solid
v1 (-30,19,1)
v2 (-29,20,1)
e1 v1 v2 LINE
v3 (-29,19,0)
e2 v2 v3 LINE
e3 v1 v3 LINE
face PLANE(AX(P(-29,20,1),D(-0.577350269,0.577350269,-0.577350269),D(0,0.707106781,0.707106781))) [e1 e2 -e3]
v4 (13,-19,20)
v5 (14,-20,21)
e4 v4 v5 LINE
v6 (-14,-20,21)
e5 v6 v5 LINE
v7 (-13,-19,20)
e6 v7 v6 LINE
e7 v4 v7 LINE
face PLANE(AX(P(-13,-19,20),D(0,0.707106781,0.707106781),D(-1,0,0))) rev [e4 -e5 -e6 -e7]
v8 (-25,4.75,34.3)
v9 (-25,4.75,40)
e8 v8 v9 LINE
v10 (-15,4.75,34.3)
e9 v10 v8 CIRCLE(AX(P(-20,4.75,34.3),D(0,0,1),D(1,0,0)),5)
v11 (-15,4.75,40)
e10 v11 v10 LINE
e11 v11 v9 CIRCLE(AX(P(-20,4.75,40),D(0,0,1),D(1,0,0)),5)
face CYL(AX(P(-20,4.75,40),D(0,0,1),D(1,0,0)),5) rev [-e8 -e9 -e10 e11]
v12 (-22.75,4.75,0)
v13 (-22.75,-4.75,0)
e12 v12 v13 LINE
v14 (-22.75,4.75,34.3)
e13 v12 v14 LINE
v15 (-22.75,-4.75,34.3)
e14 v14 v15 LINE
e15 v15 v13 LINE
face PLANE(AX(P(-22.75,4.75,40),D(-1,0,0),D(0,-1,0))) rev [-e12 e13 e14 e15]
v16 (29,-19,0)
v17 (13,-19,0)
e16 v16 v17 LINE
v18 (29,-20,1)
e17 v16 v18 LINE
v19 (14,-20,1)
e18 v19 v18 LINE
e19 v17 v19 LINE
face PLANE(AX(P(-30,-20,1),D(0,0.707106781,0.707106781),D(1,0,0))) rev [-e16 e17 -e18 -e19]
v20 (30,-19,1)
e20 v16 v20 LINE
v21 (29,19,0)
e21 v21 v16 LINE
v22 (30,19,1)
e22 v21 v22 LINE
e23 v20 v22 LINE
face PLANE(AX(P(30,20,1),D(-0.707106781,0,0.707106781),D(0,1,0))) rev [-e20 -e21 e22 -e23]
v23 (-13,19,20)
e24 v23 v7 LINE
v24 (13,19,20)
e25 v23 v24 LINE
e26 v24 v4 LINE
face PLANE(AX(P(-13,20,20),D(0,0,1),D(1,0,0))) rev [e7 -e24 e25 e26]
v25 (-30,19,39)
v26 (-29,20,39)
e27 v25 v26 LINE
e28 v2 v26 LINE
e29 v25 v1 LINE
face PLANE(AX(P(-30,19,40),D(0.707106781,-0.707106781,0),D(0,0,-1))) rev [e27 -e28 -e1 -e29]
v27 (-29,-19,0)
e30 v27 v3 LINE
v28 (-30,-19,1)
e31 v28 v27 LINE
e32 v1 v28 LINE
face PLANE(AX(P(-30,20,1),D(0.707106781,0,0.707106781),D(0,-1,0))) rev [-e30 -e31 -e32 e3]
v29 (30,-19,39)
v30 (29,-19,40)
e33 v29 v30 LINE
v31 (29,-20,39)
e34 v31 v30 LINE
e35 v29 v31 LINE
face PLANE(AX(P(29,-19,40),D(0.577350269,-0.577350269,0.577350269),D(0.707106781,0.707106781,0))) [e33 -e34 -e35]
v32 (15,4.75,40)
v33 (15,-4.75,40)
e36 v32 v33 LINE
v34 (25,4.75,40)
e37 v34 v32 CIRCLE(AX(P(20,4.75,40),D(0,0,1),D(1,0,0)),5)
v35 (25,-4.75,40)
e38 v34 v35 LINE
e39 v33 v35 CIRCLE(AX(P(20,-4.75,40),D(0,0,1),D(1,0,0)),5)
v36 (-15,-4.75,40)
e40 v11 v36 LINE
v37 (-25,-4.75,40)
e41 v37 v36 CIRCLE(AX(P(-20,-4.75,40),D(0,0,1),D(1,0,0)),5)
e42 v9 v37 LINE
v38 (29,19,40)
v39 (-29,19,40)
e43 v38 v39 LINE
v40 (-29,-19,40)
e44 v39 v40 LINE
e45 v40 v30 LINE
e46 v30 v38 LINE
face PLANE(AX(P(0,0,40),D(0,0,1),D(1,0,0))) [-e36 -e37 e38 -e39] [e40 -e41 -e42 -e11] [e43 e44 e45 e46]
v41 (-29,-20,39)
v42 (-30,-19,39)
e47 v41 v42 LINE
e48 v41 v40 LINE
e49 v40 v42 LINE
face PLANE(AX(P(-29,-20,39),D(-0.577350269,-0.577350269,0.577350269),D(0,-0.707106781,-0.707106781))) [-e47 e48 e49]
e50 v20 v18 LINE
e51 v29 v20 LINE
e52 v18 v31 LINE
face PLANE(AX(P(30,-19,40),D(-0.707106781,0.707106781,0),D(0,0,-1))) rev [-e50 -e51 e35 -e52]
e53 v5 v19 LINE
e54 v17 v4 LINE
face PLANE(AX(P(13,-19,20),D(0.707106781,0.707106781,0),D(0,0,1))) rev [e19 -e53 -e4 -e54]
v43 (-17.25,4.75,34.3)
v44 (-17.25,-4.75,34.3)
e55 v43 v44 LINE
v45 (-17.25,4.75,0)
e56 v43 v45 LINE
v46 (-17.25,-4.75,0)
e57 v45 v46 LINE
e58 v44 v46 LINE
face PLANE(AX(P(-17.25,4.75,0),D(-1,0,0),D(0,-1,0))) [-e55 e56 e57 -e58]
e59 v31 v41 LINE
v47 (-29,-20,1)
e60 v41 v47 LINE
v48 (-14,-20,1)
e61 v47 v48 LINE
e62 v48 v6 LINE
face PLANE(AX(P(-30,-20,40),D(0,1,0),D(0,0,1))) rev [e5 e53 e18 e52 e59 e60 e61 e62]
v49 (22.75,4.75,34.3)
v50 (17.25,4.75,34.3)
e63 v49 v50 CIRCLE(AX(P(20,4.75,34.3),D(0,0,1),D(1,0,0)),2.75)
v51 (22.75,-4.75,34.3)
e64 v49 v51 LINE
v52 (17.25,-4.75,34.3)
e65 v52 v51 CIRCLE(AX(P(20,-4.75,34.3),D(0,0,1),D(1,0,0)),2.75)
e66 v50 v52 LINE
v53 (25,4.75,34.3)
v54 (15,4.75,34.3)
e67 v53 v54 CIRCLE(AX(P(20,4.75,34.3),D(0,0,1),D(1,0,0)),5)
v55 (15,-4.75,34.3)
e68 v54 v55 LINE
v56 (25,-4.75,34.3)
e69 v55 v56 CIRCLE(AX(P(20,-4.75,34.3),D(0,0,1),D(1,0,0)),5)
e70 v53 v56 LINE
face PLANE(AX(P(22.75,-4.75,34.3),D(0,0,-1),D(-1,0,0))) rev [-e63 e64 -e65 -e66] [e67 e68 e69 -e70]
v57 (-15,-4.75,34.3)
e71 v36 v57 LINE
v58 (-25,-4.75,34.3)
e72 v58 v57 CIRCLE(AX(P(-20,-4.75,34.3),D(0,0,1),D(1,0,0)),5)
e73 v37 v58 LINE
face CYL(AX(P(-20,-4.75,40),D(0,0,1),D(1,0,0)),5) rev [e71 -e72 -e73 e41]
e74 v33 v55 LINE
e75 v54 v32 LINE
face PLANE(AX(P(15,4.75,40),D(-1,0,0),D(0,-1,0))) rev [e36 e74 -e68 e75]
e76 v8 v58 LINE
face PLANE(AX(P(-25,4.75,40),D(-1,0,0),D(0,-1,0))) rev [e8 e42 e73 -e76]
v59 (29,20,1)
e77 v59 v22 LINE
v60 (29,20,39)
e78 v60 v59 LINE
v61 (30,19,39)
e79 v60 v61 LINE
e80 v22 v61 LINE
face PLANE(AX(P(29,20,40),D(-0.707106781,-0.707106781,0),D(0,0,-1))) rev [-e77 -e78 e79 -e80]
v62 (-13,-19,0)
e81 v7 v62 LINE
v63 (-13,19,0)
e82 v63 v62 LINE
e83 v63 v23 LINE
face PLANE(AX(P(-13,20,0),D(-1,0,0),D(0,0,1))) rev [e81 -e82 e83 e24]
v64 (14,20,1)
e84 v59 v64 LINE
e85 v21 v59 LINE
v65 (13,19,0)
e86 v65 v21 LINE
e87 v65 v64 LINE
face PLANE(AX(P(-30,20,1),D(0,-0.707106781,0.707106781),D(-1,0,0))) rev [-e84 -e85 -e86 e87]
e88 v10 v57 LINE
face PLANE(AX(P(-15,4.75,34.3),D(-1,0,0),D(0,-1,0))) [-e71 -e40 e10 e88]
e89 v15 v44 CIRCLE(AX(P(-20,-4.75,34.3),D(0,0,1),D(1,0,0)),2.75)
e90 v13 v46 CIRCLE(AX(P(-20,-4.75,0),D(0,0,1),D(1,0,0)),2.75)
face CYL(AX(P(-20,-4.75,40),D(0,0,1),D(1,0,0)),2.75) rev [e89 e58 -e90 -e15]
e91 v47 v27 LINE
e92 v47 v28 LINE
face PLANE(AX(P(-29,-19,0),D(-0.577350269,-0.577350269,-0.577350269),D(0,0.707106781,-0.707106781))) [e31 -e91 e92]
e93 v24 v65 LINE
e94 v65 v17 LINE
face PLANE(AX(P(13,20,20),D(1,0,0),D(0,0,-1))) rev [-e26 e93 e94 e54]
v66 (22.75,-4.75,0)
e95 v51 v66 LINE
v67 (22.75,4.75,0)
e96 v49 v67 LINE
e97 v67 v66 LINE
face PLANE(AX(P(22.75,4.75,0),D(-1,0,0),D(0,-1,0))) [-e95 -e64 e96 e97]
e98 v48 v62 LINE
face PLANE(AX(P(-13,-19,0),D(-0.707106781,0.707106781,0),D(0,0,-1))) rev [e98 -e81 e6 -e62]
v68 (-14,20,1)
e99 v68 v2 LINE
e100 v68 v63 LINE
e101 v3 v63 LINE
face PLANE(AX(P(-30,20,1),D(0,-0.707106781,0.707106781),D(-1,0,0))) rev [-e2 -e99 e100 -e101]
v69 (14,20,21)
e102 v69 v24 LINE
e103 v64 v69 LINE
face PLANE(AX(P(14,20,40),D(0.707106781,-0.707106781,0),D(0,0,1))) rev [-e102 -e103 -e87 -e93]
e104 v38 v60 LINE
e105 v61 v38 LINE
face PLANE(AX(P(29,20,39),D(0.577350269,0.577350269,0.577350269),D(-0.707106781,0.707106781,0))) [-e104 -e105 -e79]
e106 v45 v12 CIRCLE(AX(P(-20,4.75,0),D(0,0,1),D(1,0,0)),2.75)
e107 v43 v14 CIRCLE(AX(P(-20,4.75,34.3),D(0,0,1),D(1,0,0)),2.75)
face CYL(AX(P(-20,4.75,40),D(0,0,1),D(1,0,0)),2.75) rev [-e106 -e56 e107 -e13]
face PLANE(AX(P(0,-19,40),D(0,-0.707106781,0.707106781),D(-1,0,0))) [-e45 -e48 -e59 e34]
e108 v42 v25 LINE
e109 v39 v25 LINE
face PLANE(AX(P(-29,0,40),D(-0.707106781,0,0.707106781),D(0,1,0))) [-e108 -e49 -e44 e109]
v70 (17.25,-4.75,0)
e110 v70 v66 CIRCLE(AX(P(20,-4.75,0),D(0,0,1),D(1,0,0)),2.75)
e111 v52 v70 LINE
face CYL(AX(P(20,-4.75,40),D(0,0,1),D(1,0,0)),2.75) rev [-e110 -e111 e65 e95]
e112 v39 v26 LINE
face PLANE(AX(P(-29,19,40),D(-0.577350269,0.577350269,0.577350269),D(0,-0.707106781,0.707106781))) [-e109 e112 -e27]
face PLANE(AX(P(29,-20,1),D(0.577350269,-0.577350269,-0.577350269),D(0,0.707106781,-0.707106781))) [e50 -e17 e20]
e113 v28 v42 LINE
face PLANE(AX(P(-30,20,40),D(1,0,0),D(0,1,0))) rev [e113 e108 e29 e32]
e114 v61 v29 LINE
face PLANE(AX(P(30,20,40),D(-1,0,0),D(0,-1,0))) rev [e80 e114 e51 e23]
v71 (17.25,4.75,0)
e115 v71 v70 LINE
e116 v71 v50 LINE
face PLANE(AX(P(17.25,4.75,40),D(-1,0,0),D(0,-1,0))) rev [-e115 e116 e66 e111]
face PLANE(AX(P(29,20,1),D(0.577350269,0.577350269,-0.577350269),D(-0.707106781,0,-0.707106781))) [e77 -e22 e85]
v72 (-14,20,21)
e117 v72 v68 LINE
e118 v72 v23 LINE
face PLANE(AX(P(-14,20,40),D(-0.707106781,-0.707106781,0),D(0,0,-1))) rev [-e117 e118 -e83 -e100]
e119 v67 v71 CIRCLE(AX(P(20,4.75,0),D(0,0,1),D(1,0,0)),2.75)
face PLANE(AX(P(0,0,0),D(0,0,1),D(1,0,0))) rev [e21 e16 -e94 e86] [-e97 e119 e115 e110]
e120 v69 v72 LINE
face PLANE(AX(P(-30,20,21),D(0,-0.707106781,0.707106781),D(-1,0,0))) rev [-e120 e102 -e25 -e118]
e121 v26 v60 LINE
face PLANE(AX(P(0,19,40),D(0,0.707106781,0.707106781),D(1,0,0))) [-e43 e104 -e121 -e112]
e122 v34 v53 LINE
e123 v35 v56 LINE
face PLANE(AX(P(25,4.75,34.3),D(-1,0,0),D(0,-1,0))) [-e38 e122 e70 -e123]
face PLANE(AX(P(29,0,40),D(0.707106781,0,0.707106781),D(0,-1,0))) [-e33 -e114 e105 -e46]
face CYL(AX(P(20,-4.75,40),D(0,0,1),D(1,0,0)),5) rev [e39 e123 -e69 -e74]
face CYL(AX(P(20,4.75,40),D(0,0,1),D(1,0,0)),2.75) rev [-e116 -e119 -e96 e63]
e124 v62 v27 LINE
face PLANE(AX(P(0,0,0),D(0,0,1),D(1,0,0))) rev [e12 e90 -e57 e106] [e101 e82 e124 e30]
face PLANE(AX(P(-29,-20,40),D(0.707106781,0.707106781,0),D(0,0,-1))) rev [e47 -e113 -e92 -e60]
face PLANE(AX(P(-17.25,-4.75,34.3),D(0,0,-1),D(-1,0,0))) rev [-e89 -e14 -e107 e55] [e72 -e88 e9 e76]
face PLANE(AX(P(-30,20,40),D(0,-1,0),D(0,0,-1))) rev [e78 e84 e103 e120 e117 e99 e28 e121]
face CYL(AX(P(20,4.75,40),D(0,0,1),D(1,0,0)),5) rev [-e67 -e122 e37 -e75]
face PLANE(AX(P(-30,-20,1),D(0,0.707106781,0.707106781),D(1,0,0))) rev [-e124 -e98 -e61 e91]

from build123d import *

# Parameters (mm, degrees)
SKETCH_1_W            = 60
SKETCH_1_H            = 40
EXTRUDE_1_DEPTH       = 40
HOLE_WIZARD_5_DEPTH   = 40
HOLE_START            = 34.3
HOLE_WIZARD_5_2_DEPTH = 5.7
SKETCH_9_W            = 26
SKETCH_9_H            = 20
CUT_EXTRUDE_1_DEPTH   = 65.031242374
CHAMFER_1_SIZE        = 1


# Read off the part's stored shape, not the designer's step: 打孔尺寸(%根据)内六角圆柱头螺钉的类型5
with BuildPart() as part:
    # 草图1 → 凸台-拉伸1 (new body)
    with BuildSketch(Plane.XY):
        Rectangle(SKETCH_1_W, SKETCH_1_H)
    extrude(amount=EXTRUDE_1_DEPTH)

    # 打孔尺寸(%根据)内六角圆柱头螺钉的类型5 outline → 打孔尺寸(%根据)内六角圆柱头螺钉的类型5 (cut)
    with BuildSketch(Plane.XY):
        with BuildLine():
            Line((17.25, 4.75), (17.25, -4.75))
            ThreePointArc((17.25, -4.75), (20, -7.5), (22.75, -4.75))
            Line((22.75, -4.75), (22.75, 4.75))
            ThreePointArc((22.75, 4.75), (20, 7.5), (17.25, 4.75))
        make_face()
        with BuildLine():
            Line((-22.75, 4.75), (-22.75, -4.75))
            ThreePointArc((-22.75, -4.75), (-20, -7.5), (-17.25, -4.75))
            Line((-17.25, -4.75), (-17.25, 4.75))
            ThreePointArc((-17.25, 4.75), (-20, 7.5), (-22.75, 4.75))
        make_face()
    extrude(amount=HOLE_WIZARD_5_DEPTH, mode=Mode.SUBTRACT)

    # Hole Wizard 5 2 outline → Hole Wizard 5 2 (cut)
    # profile 1 of 2: a face of its own
    with BuildSketch(Plane.XY.offset(HOLE_START)):
        with BuildLine():
            Line((15, 4.75), (15, -4.75))
            ThreePointArc((15, -4.75), (20, -9.75), (25, -4.75))
            Line((25, -4.75), (25, 4.75))
            ThreePointArc((25, 4.75), (20, 9.75), (15, 4.75))
        make_face()
        with BuildLine():
            ThreePointArc((22.75, -4.75), (20, -7.5), (17.25, -4.75))
            Line((17.25, -4.75), (17.25, 4.75))
            ThreePointArc((17.25, 4.75), (20, 7.5), (22.75, 4.75))
            Line((22.75, 4.75), (22.75, -4.75))
        make_face(mode=Mode.SUBTRACT)
    # profile 2 of 2: a face of its own
    with BuildSketch(Plane.XY.offset(HOLE_START)):
        with BuildLine():
            Line((-25, 4.75), (-25, -4.75))
            ThreePointArc((-25, -4.75), (-20, -9.75), (-15, -4.75))
            Line((-15, -4.75), (-15, 4.75))
            ThreePointArc((-15, 4.75), (-20, 9.75), (-25, 4.75))
        make_face()
        with BuildLine():
            ThreePointArc((-17.25, -4.75), (-20, -7.5), (-22.75, -4.75))
            Line((-22.75, -4.75), (-22.75, 4.75))
            ThreePointArc((-22.75, 4.75), (-20, 7.5), (-17.25, 4.75))
            Line((-17.25, 4.75), (-17.25, -4.75))
        make_face(mode=Mode.SUBTRACT)
    extrude(amount=HOLE_WIZARD_5_2_DEPTH, mode=Mode.SUBTRACT)

    # 草图9 → 切除-拉伸1 (cut, through all)
    with BuildSketch(Plane.XZ.offset(20)):
        with Locations((0, 10)):
            Rectangle(SKETCH_9_W, SKETCH_9_H)
    extrude(amount=-CUT_EXTRUDE_1_DEPTH, mode=Mode.SUBTRACT)

    # 倒角1
    chamfer_1_edges = [part.edges().sort_by_distance(p)[0] for p in [
        (-30, 0, 40),
        (0, -20, 40),
        (30, 0, 40),
        (-21.5, -20, 0),
        (-30, 0, 0),
        (21.5, 20, 0),
        (21.5, -20, 0),
        (-21.5, 20, 0),
        (30, 0, 0),
        (13, 20, 10),
        (-13, 20, 10),
        (0, 20, 20),
        (13, -20, 10),
        (0, -20, 20),
        (-13, -20, 10),
        (0, 20, 40),
        (30, -20, 20),
        (-30, -20, 20),
        (-30, 20, 20),
        (30, 20, 20),
    ]]
    chamfer(chamfer_1_edges, length=CHAMFER_1_SIZE)


solid = part.part
